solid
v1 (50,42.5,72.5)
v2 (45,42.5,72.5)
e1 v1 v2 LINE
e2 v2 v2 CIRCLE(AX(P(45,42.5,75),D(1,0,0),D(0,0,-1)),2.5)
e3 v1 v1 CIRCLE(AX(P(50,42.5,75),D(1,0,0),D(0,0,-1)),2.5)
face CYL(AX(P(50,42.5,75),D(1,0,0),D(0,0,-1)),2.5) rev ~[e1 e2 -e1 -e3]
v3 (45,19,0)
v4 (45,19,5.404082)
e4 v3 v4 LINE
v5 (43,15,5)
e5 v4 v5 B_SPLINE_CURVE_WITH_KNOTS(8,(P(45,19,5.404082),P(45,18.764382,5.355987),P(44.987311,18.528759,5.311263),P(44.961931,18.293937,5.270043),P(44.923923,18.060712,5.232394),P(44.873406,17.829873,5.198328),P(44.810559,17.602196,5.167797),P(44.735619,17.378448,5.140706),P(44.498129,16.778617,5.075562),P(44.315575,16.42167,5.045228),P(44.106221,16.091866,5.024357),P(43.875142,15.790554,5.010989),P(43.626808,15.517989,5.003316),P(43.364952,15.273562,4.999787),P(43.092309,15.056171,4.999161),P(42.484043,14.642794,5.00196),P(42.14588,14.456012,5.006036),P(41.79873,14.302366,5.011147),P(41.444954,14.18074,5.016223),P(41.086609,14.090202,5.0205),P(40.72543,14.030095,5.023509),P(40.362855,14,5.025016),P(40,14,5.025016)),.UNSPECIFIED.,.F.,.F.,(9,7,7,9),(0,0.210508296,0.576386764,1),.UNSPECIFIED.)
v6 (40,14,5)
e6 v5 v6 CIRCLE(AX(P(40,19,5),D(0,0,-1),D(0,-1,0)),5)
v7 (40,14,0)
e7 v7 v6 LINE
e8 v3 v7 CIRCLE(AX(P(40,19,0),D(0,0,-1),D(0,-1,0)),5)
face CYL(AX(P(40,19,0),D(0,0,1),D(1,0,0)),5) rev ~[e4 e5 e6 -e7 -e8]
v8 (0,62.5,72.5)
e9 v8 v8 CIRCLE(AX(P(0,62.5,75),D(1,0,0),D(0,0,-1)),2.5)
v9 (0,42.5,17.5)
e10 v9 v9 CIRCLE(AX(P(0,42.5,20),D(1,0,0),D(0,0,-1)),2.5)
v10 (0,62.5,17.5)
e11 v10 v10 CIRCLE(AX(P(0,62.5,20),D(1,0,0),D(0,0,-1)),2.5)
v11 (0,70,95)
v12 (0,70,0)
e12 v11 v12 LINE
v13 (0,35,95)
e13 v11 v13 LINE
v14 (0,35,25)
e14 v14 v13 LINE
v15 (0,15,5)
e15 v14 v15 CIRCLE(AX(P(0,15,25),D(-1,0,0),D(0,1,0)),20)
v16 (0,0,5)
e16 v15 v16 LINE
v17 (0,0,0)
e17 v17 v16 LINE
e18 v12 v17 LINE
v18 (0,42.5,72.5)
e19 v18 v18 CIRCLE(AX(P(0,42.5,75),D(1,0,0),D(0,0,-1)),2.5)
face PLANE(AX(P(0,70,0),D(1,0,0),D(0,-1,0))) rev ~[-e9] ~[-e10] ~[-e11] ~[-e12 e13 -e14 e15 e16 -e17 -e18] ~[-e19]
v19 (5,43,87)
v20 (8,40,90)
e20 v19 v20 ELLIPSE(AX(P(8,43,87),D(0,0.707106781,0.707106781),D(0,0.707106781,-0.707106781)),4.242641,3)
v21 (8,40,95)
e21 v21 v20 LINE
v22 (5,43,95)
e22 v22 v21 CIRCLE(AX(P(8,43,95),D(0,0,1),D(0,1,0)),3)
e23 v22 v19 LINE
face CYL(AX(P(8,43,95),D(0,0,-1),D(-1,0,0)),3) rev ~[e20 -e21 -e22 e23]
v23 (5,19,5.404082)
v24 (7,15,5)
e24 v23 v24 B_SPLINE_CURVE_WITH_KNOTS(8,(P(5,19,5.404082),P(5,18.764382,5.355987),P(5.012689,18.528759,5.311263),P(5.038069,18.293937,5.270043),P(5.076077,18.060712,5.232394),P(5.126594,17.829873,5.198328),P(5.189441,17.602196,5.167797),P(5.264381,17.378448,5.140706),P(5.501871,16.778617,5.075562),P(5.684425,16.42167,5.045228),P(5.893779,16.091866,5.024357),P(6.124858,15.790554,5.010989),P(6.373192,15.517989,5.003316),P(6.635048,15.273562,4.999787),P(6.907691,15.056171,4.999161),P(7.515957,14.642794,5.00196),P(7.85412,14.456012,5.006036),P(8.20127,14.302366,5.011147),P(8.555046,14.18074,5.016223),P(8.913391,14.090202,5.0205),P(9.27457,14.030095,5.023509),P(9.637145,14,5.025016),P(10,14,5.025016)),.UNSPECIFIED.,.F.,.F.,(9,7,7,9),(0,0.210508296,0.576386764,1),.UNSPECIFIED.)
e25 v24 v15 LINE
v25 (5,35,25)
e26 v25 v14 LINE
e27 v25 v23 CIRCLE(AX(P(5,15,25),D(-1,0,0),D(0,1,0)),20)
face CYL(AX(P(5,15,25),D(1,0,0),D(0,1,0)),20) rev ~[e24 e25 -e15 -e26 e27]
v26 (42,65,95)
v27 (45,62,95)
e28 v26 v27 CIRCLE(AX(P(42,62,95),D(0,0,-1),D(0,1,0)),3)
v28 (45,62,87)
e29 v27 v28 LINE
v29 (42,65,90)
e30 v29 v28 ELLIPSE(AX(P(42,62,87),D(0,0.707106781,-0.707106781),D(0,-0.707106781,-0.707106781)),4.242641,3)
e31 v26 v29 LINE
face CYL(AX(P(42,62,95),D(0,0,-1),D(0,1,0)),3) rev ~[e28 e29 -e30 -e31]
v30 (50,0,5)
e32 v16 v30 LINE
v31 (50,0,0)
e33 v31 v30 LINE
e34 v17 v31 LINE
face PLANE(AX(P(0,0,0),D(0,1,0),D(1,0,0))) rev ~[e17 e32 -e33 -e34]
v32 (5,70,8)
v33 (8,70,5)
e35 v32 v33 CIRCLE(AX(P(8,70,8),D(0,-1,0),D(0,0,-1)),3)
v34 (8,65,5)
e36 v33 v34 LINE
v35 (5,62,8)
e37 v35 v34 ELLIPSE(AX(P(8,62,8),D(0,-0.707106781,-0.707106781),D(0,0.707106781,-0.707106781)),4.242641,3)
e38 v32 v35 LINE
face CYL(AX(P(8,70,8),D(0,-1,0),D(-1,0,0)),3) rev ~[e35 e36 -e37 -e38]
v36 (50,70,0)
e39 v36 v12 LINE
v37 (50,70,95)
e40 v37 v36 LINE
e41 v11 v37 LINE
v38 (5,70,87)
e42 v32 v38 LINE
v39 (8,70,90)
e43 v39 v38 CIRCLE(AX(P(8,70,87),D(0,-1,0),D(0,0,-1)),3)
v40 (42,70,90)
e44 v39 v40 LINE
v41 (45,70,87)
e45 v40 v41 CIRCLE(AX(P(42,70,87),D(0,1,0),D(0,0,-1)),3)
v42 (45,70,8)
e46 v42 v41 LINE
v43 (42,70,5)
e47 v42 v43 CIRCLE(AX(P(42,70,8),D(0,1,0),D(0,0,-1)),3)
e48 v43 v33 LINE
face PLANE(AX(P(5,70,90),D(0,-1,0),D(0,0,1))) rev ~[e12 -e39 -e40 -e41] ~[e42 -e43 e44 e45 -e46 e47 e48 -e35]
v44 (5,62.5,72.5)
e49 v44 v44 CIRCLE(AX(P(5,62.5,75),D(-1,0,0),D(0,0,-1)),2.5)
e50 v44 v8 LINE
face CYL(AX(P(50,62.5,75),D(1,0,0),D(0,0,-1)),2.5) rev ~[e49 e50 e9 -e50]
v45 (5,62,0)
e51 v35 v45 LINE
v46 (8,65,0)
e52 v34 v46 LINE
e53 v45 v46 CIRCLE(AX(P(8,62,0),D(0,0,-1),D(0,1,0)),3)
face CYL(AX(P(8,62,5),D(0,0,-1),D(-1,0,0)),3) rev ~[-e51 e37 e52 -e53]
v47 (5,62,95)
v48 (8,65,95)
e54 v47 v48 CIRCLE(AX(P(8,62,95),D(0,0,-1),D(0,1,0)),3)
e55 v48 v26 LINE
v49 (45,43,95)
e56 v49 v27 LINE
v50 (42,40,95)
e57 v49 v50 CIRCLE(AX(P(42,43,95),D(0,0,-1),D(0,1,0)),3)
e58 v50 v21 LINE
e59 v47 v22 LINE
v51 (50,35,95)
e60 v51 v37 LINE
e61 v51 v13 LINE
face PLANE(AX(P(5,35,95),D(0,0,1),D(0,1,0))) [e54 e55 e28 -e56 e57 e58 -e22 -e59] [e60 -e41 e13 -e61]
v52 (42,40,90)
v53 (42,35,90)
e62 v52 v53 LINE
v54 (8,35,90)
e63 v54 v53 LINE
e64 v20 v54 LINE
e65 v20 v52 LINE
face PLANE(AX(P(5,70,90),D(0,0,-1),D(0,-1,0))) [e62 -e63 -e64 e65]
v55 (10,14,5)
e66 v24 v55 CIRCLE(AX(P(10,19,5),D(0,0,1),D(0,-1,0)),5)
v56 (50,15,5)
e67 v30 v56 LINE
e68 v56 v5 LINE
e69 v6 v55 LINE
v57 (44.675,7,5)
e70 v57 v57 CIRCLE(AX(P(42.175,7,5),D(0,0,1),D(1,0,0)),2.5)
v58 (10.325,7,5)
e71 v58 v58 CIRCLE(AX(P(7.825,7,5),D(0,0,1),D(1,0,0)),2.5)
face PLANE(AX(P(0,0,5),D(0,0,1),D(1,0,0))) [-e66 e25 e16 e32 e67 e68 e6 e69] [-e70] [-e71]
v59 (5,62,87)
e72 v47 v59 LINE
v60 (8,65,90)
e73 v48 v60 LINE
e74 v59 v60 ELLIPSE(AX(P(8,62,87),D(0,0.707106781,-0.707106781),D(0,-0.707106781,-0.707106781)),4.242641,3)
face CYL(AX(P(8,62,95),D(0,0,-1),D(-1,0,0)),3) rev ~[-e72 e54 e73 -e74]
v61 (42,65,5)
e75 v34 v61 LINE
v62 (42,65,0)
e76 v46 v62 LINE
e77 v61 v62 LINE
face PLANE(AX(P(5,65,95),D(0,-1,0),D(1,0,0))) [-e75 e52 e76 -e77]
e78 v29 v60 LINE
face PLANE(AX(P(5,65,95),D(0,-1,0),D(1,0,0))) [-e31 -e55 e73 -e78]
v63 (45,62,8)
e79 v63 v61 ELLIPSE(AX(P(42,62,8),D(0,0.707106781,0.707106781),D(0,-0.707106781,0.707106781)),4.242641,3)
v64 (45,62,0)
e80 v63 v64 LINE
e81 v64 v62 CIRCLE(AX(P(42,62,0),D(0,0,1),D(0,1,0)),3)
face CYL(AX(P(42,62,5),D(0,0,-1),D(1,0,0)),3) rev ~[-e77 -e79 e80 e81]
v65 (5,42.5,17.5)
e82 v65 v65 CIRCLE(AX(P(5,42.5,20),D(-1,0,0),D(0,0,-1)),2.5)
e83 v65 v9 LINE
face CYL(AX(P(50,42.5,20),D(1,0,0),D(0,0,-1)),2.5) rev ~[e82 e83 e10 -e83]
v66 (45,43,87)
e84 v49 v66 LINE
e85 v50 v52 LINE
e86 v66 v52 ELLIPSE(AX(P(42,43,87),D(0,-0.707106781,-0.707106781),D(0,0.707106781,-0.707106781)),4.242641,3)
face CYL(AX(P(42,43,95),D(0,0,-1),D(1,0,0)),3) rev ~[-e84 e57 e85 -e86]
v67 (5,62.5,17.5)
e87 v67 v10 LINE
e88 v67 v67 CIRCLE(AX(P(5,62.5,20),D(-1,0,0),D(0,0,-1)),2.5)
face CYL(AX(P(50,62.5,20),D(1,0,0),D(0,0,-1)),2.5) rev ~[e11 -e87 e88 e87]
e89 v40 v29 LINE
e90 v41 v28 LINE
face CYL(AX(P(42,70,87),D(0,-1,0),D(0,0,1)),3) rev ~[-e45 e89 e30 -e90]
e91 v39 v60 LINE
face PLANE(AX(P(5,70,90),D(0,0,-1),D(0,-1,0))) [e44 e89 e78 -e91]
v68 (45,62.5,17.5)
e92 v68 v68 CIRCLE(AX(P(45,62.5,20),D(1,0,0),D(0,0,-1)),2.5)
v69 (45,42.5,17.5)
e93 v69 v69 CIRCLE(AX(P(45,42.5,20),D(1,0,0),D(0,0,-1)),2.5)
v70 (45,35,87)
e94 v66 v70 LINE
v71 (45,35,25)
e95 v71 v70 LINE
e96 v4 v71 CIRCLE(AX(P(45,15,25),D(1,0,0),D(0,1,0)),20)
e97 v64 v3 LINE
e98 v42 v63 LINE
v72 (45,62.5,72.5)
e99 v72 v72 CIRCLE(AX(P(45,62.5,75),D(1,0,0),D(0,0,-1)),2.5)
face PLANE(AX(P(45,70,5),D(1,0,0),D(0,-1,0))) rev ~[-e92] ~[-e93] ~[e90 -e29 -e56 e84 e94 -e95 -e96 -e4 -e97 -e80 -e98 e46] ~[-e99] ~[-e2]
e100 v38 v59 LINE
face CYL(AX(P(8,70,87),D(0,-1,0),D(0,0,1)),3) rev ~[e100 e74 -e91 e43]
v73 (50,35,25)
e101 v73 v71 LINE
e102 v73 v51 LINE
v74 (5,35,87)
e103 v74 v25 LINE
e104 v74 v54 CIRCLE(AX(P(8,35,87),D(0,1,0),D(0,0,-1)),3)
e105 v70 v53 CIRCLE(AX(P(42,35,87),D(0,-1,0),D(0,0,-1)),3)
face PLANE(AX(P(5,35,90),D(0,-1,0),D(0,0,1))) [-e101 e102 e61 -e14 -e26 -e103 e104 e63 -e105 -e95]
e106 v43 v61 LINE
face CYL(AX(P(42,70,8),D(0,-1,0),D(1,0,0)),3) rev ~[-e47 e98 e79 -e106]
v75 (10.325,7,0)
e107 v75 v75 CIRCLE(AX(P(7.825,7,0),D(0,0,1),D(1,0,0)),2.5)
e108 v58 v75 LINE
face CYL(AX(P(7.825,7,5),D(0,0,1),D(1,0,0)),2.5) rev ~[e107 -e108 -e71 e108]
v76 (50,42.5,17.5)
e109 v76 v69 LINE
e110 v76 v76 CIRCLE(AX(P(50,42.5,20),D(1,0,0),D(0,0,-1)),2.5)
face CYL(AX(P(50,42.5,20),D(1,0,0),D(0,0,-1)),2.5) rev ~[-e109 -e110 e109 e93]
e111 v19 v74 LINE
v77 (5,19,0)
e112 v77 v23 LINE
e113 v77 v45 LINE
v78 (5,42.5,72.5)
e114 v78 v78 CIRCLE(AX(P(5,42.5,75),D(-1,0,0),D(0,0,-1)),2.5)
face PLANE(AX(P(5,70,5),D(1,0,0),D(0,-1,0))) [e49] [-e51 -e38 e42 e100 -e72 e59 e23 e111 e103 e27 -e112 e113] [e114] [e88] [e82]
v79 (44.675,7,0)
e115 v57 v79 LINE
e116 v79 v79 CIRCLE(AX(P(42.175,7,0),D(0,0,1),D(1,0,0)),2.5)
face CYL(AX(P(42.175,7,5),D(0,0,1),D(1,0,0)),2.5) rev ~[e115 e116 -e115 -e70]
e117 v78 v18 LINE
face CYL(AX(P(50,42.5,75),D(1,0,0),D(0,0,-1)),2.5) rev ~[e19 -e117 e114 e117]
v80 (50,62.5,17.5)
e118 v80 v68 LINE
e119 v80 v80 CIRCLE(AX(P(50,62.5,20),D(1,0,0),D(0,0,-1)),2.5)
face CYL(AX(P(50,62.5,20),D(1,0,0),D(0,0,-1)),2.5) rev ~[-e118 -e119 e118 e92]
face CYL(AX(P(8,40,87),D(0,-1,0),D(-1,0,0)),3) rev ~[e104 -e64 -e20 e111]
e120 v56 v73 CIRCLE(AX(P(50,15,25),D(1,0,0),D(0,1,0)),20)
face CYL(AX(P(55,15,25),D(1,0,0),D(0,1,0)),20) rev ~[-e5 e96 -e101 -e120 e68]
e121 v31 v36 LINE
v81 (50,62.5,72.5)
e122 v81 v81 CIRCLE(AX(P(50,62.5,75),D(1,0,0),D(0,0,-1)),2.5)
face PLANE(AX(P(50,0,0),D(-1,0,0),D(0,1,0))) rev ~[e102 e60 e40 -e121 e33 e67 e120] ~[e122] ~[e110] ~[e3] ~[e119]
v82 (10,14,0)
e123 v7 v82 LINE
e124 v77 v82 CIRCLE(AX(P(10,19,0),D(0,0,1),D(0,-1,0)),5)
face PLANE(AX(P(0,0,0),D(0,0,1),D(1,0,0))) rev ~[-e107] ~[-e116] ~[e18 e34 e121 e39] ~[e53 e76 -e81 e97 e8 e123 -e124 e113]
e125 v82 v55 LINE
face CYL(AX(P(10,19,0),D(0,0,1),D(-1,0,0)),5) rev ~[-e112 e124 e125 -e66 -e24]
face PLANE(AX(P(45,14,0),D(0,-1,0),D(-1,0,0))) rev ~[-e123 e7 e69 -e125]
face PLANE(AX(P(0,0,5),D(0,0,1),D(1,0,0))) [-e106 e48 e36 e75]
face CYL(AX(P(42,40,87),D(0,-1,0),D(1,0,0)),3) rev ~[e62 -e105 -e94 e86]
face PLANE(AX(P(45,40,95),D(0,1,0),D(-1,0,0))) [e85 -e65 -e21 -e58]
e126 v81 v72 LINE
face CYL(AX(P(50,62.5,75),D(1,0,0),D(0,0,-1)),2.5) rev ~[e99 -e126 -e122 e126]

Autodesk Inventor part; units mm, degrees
ref_plane "YZ Plane" through (0, 0, 0) normal (1, 0, 0) x (0, 1, 0)
ref_plane "XZ Plane" through (0, 0, 0) normal (0, 1, 0) x (-1, 0, 0)
ref_plane "XY Plane" through (0, 0, 0) normal (0, 0, 1) x (1, 0, 0)
sketch "Sketch1" plane through (0, 0, 0) normal (0, 0, 1) x (1, 0, 0)
  line L0 (0, 0) -> (50, 0)
  line L1 (50, 0) -> (50, 70)
  line L2 (50, 70) -> (0, 70)
  line L3 (0, 70) -> (0, 0)
  dimension "d0" = 50
  dimension "d1" = 70
extrude "Extrusion1" add sketch "Sketch1" along normal blind 5
sketch "Sketch2" plane through (0, 0, 5) normal (0, 0, 1) x (1, 0, 0)
  circle A0 centre (7.825, 7) radius 2.5
  circle A1 centre (42.175, 7) radius 2.5
  line L0 (0, 0) -> (50, 0) projected
  line L1 (50, 0) -> (50, 70) projected
  line L2 (50, 70) -> (0, 70) projected
  line L3 (0, 70) -> (0, 0) projected
  dimension "d4" = 34.35
  dimension "d5" = 5
  dimension "d6" = 5
  dimension "d7" = 50
  dimension "d8" = 7.825
  dimension "d9" = 7
  dimension "d10" = 7
extrude "Extrusion2" cut sketch "Sketch2" against normal up to next contours A0 | A1
sketch "Sketch3" plane through (0, 0, 5) normal (0, 0, 1) x (1, 0, 0)
  circle A0 centre (7.825, 7) radius 2.5 projected
  circle A1 centre (42.175, 7) radius 2.5 projected
  line L0 (0, 0) -> (50, 0) projected
  line L1 (50, 0) -> (50, 70) projected
  line L2 (50, 70) -> (0, 70) projected
  line L3 (0, 70) -> (0, 0) projected
  line L4 (0, 70) -> (5, 70)
  line L5 (5, 70) -> (5, 35)
  line L6 (5, 35) -> (0, 35)
  line L7 (0, 35) -> (0, 70)
  line L8 (50, 70) -> (45, 70)
  line L9 (45, 70) -> (45, 35)
  line L10 (45, 35) -> (50, 35)
  line L11 (50, 35) -> (50, 70)
  dimension "d13" = 5
  dimension "d14" = 5
  dimension "d15" = 35
extrude "Extrusion3" add sketch "Sketch3" along normal blind 90 contours L3 L2 L5 L6 | L10 L9 L2 L1
sketch "Sketch4" plane through (50, 0, 0) normal (1, 0, 0) x (0, 0, -1)
  line L0 (0, 0) -> (0, 70) projected
  line L1 (0, 70) -> (-95, 70) projected
  line L2 (-95, 35) -> (-95, 70) projected
  line L3 (-5, 35) -> (-95, 35) projected
  line L4 (-5, 0) -> (-5, 35) projected
  line L5 (0, 0) -> (-5, 0) projected
  circle A0 centre (-20, 62.5) radius 2.5
  circle A1 centre (-20, 42.5) radius 2.5
  circle A2 centre (-75, 62.5) radius 2.5
  circle A3 centre (-75, 42.5) radius 2.5
  point P0 (0, 0)
  dimension "d18" = 5
  dimension "d19" = 5
  dimension "d20" = 20
  dimension "d21" = 5
  dimension "d22" = 5
  dimension "d23" = 35
  dimension "d24" = 20
  dimension "d26" = 7.5
  dimension "d27" = 55
  dimension "d28" = 55
  dimension "d31" = 7.5
  dimension "d42" = 20
  dimension "d43" = 20
extrude "Extrusion4" cut sketch "Sketch4" against normal through all contours A0 | A1 | A2 | A3
sketch "Sketch5" plane through (5, 35, 5) normal (1, 0, 0) x (0, 0, -1)
  circle A0 centre (-70, 27.5) radius 2.5 projected
  circle A1 centre (-15, 27.5) radius 2.5 projected
  circle A2 centre (-15, 7.5) radius 2.5 projected
  circle A3 centre (-70, 7.5) radius 2.5 projected
  line L0 (0, 35) -> (0, 0) projected
  line L1 (0, 35) -> (-90, 35) projected
  line L2 (-90, 0) -> (-90, 35) projected
  line L3 (0, 0) -> (-90, 0) projected
  line L4 (0, 0) -> (-90, 0) projected
  line L5 (-90, 35) -> (-85, 35)
  line L6 (-85, 35) -> (-85, 0)
  line L7 (-85, 0) -> (-90, 0)
  line L8 (-90, 0) -> (-90, 35)
  point P0 (5, -35)
  dimension "d34" = 5
extrude "Extrusion5" add sketch "Sketch5" along normal up to next contours L6 L3 L2 L1
sketch "Sketch6" plane through (0, 0, 95) normal (0, 0, 1) x (1, 0, 0)
  line L0 (45, 35) -> (45, 70) projected
  line L1 (45, 70) -> (5, 70) projected
  line L2 (5, 70) -> (5, 35) projected
  line L3 (5, 35) -> (0, 35) projected
  line L4 (0, 35) -> (0, 0) projected
  line L5 (0, 0) -> (50, 0) projected
  line L6 (50, 0) -> (50, 35) projected
  line L7 (50, 35) -> (45, 35) projected
  circle A0 centre (7.825, 7) radius 2.5 projected
  circle A1 centre (42.175, 7) radius 2.5 projected
  line L8 (50, 70) -> (0, 70) projected
  line L9 (0, 70) -> (0, 35) projected
  line L10 (0, 35) -> (50, 35) projected
  line L11 (50, 35) -> (50, 70) projected
  line L12 (5, 65) -> (45, 65)
  line L13 (45, 65) -> (45, 40)
  line L14 (45, 40) -> (5, 40)
  line L15 (5, 40) -> (5, 65)
  dimension "d37" = 5
  dimension "d38" = 5
extrude "Extrusion6" cut sketch "Sketch6" against normal through all contours L14 L2 L12 L0
fillet "Fillet1" radius 3 16 edges at (45, 37.5, 5) (5, 37.5, 5) (5, 65, 2.5) (5, 67.5, 5) (5, 65, 92.5) (5, 67.5, 90) (45, 67.5, 5) (45, 65, 2.5) (45, 65, 92.5) (45, 67.5, 90) (45, 40, 2.5) (5, 40, 2.5) (45, 40, 92.5) (45, 37.5, 90) (5, 40, 92.5) (5, 37.5, 90)
sketch "Sketch7" plane through (0, 0, 0) normal (0, 0, -1) x (-1, 0, 0)
  line L0 (-42, 40) -> (-8, 40) projected
  arc A0 (-8, 40) -> (-5, 43) centre (-8, 43) ccw projected
  line L1 (-5, 43) -> (-5, 62) projected
  arc A1 (-5, 62) -> (-8, 65) centre (-8, 62) ccw projected
  line L2 (-8, 65) -> (-42, 65) projected
  arc A2 (-42, 65) -> (-45, 62) centre (-42, 62) ccw projected
  line L3 (-45, 62) -> (-45, 43) projected
  arc A3 (-45, 43) -> (-42, 40) centre (-42, 43) ccw projected
  line L4 (-50, 70) -> (0, 70) projected
  line L5 (0, 70) -> (0, 35) projected
  line L6 (0, 35) -> (-50, 35) projected
  line L7 (-50, 35) -> (-50, 70) projected
  line L8 (-8, 40) -> (-42, 40) projected
  arc A4 (-45, 43) -> (-42, 40) centre (-42, 43) ccw projected
  line L9 (-45, 43) -> (-45, 62) projected
  arc A5 (-42, 65) -> (-45, 62) centre (-42, 62) ccw projected
  line L10 (-42, 65) -> (-8, 65) projected
  arc A6 (-5, 62) -> (-8, 65) centre (-8, 62) ccw projected
  line L11 (-5, 62) -> (-5, 43) projected
  arc A7 (-8, 40) -> (-5, 43) centre (-8, 43) ccw projected
  circle A8 centre (-7.825, 7) radius 2.5 projected
  circle A9 centre (-42.175, 7) radius 2.5 projected
  line L12 (0, 0) -> (-50, 0) projected
  line L13 (0, 70) -> (0, 0) projected
  line L14 (-50, 70) -> (0, 70) projected
  line L15 (-50, 0) -> (-50, 70) projected
  line L16 (-5, 43) -> (-5, 62) projected
  line L17 (-5, 43) -> (-45, 43)
  line L18 (-45, 43) -> (-45, 14)
  line L19 (-45, 14) -> (-5, 14)
  line L20 (-5, 14) -> (-5, 43)
  line L21 (-45, 43) -> (-45, 62) projected
  dimension "d44" = 7
  dimension "d45" = 7
extrude "Extrusion7" cut sketch "Sketch7" against normal up to next contours L0 A0 L20 L6 L18 A3 | L6 L20 L19 L18
fillet "Fillet2" radius 20 1 edges at (2.5, 35, 5)
fillet "Fillet3" radius 5 2 edges at (5, 14, 2.5) (45, 14, 2.5)
equation "\"d8\" = -0.5 * d4 + 0.5 * d7"
equation "\"d10\" = d9"
equation "\"d13\" = d14"
equation "\"d26\" = -0.5 * d24 + 0.5 * d23"
equation "\"d28\" = d27"
equation "\"d31\" = d26"
equation "\"d43\" = d42"
equation "\"d45\" = d44"
properties part number "tubing_alignment_arm[2]"
